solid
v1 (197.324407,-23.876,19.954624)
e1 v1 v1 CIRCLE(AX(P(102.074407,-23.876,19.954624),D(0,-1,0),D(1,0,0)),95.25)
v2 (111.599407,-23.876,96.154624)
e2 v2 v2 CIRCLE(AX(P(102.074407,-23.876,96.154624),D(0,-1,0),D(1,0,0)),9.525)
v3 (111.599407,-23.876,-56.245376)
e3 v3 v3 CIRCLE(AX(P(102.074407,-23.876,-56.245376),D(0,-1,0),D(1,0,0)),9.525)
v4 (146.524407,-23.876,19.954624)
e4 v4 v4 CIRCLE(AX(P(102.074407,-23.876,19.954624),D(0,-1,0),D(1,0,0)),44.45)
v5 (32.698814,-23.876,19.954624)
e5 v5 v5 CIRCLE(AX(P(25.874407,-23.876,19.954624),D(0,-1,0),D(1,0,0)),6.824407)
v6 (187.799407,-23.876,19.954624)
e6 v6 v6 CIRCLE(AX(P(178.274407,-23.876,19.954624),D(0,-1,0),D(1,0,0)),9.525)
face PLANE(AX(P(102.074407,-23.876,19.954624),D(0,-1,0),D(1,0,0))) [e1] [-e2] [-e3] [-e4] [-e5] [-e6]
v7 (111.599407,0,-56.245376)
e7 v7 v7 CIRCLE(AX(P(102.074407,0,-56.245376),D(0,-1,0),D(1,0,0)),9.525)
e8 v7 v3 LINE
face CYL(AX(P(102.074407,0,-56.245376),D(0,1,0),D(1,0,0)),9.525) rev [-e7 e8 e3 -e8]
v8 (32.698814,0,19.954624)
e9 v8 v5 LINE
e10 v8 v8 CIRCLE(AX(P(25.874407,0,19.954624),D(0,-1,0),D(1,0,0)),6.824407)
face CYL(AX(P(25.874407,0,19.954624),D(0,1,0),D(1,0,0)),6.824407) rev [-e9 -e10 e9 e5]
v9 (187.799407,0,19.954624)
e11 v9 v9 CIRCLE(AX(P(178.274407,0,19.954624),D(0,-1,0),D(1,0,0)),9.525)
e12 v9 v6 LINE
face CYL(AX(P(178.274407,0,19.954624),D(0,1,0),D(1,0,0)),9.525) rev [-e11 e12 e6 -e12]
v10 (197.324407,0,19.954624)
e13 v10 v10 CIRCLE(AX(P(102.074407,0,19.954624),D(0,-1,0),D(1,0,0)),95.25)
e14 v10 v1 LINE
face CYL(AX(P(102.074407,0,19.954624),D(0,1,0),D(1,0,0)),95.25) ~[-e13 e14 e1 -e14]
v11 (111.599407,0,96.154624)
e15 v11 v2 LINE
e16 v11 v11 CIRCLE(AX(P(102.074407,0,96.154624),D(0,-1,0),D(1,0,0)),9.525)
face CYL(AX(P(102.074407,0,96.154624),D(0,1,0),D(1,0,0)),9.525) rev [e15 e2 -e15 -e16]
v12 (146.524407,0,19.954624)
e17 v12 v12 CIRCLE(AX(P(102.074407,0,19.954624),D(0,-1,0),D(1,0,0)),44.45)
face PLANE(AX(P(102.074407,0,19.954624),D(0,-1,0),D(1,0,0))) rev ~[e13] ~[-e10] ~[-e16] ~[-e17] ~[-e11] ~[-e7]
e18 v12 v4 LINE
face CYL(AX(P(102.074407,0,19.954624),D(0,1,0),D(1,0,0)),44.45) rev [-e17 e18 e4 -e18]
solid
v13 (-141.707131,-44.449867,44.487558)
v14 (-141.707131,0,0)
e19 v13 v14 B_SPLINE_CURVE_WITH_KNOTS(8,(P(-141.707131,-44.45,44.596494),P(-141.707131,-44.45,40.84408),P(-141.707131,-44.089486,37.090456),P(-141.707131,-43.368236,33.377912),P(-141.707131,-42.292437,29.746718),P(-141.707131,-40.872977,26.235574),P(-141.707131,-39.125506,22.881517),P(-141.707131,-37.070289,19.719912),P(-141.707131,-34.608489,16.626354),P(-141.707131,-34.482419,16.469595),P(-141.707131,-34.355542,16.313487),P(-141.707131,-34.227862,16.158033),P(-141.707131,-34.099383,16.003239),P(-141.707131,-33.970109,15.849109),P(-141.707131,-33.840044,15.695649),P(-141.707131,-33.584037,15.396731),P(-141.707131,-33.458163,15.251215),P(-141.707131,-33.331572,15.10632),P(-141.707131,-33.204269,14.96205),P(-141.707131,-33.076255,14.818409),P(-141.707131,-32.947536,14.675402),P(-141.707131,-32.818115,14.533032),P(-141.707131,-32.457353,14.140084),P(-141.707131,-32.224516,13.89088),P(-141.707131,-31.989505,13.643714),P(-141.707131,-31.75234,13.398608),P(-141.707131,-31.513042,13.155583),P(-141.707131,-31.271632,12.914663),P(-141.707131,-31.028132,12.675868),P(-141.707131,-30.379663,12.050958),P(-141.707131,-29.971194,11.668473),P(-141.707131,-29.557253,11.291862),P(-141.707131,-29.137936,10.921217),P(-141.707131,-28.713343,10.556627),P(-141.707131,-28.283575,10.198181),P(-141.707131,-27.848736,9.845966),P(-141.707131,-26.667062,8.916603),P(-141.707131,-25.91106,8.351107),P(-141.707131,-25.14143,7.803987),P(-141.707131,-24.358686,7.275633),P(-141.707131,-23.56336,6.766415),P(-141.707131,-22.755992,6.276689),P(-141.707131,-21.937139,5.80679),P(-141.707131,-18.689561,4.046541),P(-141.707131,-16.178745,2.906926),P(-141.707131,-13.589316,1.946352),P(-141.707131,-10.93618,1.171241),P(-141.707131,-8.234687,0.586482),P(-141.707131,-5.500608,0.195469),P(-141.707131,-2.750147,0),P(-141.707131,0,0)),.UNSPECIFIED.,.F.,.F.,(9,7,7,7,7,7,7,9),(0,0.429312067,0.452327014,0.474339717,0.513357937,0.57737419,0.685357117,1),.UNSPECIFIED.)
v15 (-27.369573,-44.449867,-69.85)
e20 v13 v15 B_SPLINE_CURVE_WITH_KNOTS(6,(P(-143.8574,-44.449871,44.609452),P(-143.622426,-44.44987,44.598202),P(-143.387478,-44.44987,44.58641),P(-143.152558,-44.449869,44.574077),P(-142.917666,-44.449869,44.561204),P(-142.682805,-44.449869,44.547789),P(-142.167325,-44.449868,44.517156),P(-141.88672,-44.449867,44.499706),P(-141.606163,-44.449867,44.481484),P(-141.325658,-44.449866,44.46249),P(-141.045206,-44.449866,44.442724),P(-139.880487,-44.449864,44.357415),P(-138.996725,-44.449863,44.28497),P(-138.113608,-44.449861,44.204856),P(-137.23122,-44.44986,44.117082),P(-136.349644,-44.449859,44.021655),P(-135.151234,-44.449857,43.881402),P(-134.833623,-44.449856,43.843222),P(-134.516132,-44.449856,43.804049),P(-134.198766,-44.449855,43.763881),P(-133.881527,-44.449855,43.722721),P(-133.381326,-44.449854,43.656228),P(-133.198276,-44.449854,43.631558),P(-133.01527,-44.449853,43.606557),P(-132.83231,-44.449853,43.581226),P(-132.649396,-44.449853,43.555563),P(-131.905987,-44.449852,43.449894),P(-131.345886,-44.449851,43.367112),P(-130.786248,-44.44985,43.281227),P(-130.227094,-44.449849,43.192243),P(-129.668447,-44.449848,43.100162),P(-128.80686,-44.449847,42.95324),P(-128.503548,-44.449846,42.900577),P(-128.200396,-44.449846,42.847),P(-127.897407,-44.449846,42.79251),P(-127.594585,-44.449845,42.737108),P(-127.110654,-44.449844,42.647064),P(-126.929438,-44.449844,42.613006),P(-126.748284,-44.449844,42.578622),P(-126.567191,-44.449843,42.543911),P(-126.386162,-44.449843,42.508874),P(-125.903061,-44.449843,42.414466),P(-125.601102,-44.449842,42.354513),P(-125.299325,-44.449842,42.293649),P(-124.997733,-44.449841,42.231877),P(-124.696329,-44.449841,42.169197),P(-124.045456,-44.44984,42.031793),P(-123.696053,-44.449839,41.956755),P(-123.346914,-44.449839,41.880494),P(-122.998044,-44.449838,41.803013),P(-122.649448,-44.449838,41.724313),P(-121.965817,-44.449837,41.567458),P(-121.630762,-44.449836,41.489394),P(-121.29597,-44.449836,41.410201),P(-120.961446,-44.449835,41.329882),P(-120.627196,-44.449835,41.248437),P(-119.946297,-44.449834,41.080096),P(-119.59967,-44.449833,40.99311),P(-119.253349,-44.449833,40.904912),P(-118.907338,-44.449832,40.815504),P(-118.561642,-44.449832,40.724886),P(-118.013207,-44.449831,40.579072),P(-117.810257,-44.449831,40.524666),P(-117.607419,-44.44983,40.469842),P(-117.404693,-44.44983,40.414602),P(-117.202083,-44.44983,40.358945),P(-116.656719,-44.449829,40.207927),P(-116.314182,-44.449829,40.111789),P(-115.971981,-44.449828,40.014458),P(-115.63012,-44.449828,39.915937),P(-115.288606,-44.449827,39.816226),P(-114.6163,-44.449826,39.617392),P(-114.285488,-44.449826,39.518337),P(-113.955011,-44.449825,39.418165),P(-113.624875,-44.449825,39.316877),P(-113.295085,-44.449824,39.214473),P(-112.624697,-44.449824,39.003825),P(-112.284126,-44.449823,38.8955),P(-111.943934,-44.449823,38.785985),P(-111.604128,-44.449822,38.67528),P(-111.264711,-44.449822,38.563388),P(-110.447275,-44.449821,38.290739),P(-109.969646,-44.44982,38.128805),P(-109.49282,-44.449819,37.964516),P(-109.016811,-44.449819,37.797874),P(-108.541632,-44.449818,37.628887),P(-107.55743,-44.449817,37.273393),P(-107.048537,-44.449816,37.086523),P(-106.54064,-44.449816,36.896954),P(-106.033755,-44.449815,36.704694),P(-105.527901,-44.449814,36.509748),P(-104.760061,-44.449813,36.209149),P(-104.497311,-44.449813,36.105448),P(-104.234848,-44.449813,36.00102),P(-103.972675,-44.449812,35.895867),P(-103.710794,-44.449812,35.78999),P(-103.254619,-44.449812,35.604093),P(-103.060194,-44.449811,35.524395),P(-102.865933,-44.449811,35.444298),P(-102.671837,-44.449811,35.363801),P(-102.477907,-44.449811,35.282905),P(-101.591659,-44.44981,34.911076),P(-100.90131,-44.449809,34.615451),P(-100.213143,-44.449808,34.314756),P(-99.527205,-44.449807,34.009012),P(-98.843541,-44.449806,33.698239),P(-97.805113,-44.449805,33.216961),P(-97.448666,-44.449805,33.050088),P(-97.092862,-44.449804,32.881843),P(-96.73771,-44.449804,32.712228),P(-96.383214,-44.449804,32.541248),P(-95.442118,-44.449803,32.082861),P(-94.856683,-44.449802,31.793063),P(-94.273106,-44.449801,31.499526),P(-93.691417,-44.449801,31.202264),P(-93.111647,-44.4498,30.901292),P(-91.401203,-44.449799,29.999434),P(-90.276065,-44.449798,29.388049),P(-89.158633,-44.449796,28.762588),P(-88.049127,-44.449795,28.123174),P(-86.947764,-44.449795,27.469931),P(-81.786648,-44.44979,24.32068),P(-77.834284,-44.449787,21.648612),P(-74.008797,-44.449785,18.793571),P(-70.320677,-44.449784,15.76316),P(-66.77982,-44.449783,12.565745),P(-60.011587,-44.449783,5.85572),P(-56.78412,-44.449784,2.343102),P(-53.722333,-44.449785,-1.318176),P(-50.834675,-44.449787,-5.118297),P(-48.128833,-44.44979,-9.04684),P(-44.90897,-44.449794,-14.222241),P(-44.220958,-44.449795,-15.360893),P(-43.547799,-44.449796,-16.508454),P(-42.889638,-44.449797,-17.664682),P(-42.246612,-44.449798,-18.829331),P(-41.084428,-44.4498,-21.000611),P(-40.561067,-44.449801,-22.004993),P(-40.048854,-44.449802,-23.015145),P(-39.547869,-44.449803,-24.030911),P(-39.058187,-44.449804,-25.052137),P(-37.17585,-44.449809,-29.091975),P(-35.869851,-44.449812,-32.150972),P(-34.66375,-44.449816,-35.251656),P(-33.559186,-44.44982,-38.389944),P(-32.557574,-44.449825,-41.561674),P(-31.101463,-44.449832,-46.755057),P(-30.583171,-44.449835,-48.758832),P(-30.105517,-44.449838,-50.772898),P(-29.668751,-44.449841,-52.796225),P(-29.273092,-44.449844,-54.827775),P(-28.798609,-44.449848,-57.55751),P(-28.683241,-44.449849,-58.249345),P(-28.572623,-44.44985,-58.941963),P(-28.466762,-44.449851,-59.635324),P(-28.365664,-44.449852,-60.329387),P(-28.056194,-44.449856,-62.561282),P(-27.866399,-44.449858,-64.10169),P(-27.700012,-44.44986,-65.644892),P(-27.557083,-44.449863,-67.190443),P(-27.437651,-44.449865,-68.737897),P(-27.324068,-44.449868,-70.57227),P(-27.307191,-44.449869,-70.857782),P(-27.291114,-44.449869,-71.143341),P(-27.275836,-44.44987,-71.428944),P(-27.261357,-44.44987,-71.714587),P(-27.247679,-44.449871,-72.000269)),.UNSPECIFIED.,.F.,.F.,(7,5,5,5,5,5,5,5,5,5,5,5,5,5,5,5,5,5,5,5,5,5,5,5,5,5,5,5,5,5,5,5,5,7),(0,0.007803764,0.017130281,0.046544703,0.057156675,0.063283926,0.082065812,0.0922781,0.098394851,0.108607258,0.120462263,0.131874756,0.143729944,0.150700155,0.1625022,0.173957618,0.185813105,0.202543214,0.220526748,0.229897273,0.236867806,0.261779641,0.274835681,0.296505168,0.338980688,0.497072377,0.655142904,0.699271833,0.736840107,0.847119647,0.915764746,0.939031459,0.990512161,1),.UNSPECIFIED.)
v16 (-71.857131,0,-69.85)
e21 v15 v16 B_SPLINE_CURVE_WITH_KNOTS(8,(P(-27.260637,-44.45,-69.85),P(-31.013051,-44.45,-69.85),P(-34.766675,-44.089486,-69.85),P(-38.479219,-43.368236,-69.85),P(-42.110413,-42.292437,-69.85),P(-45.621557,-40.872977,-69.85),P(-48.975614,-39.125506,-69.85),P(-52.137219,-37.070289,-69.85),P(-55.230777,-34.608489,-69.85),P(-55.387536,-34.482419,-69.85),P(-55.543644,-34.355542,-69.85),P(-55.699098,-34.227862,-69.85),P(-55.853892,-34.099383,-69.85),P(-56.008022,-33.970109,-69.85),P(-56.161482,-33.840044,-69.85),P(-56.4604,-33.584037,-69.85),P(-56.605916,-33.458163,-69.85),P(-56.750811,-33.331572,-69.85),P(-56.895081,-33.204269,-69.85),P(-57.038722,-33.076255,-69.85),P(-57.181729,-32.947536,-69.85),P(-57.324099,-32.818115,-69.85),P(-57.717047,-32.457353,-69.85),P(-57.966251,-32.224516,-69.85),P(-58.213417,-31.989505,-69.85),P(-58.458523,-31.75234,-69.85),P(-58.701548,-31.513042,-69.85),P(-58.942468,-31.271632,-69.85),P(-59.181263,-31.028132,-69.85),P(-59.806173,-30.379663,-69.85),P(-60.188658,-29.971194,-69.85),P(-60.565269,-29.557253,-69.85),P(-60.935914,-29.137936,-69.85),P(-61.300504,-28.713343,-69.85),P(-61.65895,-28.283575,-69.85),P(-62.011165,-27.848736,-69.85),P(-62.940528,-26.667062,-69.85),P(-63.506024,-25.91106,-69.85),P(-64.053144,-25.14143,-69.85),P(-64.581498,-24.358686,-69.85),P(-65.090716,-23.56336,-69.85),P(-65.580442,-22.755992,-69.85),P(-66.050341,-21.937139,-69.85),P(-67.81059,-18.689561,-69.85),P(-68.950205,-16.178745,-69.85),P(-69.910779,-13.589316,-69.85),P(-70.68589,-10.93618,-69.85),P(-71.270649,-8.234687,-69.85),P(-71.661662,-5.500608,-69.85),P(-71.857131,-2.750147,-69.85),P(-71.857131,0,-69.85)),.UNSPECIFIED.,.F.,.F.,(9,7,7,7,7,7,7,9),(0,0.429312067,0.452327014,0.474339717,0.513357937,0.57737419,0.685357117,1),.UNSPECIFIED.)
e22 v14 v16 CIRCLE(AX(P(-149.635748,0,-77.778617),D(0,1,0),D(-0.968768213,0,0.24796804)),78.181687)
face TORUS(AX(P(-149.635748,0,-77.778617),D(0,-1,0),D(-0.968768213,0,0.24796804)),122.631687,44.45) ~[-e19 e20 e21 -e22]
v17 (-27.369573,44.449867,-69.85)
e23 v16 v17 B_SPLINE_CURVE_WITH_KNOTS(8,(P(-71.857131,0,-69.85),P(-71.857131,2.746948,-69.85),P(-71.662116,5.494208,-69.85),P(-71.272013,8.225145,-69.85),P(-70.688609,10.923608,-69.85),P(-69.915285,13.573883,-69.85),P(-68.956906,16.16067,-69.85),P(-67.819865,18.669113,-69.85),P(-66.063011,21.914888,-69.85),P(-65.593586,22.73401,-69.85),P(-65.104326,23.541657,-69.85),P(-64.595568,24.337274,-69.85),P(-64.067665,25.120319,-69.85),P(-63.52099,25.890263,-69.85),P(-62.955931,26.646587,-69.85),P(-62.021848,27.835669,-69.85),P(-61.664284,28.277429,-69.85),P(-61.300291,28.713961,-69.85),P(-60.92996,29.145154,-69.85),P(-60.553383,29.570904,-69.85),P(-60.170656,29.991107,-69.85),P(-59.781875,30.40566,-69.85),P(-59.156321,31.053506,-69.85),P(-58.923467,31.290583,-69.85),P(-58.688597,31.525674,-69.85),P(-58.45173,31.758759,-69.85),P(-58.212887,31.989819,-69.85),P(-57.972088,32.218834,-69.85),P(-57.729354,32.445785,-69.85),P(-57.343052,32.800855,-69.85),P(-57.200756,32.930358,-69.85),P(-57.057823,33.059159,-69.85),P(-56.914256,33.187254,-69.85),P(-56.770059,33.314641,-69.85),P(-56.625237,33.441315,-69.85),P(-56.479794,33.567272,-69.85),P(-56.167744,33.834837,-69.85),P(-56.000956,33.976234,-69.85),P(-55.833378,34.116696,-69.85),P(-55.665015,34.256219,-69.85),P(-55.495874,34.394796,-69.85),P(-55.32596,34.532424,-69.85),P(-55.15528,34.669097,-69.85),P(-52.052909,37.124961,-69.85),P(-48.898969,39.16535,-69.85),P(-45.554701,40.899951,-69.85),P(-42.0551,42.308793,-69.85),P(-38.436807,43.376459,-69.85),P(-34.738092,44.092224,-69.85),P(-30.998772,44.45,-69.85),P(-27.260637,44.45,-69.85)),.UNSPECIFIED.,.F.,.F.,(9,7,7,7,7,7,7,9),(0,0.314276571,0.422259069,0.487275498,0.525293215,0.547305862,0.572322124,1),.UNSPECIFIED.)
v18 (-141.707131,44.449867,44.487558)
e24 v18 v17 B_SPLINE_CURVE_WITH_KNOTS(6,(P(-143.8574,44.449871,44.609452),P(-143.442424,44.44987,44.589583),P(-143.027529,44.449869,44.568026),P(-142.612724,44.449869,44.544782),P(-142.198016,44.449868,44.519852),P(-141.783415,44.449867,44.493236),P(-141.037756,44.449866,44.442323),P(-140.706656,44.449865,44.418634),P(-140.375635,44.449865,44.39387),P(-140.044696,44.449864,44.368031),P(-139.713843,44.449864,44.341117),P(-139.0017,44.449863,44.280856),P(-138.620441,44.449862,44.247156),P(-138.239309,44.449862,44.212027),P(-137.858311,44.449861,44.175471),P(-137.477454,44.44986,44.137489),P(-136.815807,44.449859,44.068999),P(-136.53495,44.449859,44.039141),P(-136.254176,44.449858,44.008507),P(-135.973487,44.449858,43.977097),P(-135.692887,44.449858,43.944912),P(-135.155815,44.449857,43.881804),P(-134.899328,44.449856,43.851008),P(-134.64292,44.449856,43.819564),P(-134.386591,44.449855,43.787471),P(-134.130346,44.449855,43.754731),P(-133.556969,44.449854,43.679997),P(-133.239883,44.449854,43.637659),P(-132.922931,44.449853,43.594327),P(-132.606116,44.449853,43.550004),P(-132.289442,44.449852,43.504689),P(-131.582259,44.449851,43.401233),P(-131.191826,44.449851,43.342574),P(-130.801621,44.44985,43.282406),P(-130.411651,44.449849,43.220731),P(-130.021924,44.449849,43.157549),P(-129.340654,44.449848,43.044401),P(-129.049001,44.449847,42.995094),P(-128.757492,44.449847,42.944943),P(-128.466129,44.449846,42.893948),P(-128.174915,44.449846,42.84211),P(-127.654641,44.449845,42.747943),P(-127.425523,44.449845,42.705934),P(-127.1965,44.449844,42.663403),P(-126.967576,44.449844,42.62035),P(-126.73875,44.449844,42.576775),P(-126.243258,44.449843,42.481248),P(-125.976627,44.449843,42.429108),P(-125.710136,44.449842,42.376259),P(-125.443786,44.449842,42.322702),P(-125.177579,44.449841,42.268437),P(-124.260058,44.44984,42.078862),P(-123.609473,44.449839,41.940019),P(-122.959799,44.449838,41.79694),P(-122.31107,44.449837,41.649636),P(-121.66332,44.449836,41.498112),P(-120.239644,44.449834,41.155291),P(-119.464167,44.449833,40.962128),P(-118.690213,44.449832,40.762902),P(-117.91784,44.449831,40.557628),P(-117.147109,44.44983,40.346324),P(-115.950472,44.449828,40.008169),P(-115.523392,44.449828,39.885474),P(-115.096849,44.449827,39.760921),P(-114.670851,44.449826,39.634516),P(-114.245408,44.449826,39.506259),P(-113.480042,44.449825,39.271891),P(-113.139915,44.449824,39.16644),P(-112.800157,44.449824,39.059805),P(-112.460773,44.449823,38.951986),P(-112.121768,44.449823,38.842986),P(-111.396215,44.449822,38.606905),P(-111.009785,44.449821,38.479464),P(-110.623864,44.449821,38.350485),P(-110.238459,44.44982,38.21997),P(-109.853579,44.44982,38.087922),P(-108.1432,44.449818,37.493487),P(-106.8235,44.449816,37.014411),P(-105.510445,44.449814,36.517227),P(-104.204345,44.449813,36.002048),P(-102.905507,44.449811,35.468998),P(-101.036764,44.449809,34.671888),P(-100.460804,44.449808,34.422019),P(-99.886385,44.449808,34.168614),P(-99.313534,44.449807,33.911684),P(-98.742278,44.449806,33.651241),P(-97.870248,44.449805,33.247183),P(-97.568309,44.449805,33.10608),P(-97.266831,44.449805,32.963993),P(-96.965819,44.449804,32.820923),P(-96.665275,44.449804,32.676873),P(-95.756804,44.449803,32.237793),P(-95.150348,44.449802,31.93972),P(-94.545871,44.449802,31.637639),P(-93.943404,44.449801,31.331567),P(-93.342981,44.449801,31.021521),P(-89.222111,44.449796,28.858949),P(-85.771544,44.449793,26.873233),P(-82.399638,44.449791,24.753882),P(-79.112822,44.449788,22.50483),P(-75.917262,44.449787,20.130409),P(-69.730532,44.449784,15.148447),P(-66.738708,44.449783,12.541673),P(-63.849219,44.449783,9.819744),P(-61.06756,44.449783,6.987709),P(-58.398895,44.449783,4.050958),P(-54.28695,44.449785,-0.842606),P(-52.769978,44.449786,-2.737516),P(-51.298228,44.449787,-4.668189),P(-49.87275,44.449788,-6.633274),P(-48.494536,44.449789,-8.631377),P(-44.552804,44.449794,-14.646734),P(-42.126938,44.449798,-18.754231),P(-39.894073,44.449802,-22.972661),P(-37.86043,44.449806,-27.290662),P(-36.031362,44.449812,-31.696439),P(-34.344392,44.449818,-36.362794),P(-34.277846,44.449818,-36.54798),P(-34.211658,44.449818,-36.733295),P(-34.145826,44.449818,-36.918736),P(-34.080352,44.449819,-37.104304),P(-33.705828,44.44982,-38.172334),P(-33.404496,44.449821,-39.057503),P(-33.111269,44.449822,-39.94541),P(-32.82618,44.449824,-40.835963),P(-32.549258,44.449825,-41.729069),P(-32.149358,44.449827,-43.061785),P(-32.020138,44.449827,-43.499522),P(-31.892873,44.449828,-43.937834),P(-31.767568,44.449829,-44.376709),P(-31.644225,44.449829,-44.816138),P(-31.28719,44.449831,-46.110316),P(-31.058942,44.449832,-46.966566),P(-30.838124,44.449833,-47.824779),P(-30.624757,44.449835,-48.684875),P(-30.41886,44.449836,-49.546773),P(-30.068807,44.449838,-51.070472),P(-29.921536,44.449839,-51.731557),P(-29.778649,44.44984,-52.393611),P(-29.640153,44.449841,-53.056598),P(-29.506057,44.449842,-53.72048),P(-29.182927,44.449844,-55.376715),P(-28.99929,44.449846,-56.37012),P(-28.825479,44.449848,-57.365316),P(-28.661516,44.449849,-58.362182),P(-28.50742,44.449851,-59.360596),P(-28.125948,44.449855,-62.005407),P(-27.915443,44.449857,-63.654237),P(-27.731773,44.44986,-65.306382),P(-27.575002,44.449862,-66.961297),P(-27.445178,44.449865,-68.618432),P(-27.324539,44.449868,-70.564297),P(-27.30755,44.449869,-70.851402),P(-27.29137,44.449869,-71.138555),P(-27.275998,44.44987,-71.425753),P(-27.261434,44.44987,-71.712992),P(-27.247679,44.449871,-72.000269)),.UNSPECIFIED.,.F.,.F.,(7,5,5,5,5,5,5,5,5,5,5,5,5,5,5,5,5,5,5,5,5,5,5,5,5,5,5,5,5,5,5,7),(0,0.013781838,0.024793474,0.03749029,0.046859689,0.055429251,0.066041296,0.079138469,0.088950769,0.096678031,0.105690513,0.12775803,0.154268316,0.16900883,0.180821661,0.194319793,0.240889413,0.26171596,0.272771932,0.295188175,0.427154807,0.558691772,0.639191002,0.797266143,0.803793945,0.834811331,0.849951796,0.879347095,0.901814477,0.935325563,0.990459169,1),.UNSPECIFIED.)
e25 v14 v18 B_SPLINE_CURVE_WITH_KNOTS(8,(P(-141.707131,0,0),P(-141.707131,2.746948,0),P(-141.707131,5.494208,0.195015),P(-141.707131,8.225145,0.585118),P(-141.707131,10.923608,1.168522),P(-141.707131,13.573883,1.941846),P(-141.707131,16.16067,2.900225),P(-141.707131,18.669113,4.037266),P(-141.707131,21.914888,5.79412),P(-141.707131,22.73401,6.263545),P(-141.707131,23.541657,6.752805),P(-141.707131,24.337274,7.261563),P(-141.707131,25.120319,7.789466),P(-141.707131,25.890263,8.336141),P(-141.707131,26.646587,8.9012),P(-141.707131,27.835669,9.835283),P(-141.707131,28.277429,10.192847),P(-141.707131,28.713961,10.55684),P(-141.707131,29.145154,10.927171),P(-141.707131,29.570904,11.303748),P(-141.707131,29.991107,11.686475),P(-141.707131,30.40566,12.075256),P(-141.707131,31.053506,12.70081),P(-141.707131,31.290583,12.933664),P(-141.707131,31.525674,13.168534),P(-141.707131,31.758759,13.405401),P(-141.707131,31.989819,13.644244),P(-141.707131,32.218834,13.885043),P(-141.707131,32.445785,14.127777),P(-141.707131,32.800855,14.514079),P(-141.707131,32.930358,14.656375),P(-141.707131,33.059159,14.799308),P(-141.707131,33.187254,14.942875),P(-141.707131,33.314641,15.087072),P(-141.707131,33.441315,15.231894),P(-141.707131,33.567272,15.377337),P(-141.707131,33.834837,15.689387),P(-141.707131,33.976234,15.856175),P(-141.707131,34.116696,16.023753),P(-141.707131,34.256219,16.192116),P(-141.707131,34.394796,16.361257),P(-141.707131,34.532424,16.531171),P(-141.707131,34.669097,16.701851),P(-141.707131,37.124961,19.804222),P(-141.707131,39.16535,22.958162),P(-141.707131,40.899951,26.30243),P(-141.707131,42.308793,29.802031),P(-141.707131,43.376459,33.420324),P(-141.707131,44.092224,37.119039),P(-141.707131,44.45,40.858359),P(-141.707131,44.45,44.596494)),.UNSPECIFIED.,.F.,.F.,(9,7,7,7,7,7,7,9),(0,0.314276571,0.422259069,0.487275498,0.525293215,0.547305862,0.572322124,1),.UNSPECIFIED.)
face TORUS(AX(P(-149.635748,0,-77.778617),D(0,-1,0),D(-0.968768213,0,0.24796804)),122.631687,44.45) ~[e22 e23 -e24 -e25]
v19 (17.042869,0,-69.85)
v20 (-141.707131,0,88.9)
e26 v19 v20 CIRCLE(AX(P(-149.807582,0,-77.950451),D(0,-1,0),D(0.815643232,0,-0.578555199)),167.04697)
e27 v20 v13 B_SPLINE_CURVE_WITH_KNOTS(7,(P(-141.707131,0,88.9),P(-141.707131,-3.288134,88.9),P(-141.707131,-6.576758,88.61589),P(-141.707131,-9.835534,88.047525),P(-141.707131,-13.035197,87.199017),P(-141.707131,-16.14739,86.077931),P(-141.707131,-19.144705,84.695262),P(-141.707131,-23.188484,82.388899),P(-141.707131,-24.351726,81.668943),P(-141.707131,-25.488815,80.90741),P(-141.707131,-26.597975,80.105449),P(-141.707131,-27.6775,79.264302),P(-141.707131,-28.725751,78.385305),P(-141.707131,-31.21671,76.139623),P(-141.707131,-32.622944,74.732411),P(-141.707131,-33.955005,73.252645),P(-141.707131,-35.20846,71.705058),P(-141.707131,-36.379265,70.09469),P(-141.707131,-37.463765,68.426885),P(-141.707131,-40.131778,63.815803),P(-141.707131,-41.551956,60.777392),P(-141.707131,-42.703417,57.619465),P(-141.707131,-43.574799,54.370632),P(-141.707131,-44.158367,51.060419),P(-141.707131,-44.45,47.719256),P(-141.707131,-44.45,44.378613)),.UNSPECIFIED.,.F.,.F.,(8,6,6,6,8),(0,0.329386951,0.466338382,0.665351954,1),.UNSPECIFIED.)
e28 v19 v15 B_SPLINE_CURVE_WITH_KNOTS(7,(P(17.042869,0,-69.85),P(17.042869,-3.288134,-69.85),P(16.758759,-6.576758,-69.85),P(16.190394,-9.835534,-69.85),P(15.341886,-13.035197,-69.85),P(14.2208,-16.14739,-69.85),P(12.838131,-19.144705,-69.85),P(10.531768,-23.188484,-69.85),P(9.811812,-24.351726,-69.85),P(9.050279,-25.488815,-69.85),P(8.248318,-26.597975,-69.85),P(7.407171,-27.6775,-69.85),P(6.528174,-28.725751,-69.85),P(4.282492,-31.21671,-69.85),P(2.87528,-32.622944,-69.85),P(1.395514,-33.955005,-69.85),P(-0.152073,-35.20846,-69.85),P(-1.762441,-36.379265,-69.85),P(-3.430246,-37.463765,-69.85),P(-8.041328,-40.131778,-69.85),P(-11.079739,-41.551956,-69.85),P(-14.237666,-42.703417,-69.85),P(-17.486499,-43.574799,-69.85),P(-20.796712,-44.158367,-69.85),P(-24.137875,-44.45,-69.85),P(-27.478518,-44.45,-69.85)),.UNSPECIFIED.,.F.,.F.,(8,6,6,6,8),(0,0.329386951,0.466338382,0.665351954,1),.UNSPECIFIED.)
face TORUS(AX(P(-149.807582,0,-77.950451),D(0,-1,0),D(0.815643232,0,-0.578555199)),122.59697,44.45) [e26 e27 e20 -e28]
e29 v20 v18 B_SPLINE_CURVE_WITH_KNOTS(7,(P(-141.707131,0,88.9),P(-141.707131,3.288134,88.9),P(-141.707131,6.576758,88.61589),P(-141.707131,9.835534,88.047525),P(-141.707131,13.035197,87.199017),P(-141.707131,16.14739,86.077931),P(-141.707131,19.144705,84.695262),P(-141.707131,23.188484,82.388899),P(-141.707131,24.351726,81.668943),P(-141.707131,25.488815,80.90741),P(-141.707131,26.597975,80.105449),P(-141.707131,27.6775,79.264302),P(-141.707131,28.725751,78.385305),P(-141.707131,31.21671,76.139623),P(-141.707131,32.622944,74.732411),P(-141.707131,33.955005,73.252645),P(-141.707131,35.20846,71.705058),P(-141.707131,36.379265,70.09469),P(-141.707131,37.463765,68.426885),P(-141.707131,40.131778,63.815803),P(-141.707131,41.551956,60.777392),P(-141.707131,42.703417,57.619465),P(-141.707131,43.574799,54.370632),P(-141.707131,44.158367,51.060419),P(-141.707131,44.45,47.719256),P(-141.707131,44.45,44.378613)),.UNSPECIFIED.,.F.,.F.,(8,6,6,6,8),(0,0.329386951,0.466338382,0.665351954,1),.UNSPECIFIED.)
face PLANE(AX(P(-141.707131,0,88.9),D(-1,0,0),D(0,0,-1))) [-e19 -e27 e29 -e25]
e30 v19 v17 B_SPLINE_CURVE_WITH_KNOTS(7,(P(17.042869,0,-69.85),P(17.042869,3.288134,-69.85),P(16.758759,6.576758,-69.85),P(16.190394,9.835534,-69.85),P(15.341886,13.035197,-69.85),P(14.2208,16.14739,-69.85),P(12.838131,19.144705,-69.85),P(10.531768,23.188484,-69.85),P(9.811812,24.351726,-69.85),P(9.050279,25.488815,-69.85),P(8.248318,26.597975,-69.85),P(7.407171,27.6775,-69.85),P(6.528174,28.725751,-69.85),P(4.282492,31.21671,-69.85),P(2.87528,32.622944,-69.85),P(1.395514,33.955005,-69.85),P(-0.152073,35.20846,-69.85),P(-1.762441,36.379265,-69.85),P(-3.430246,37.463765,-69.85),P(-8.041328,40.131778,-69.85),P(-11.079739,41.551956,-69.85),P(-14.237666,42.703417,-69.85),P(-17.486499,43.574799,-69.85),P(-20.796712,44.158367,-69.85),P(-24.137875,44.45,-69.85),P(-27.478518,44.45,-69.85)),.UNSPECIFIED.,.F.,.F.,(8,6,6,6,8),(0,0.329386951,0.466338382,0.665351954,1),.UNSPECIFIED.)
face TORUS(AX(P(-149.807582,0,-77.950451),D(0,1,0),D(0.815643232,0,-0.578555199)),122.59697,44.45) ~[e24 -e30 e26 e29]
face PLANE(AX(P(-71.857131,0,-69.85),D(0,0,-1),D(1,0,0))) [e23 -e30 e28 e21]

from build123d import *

# Parameters (mm, degrees)
F1_DEPTH    = 44.45
F2_T2_ANGLE = 160.6979741432
F2_T4_ANGLE = 241.2853924859
F2_T6_ANGLE = 160.6979741432
F2_T8_ANGLE = 241.2853924859
F3_R        = 95.25
F3_R_2      = 9.525
F3_R_3      = 6.8244070411
F3_R_4      = 44.45
F4_DEPTH    = 23.876


# Not quite as in the source:
# - a fillet or chamfer that OpenCascade refuses, or shapes differently, is made with other operations: its cross-section is extruded or revolved along the edge and cut away or added


with BuildPart() as f1:
    # F0 (on Front) → F1 (new body, symmetric)
    with BuildSketch(Plane.XZ):
        with BuildLine():
            Line((-141.7071309926, 88.9), (-141.7071309926, 0))
            ThreePointArc((-141.7071309926, 0), (-94.3529466908, -22.4958156982), (-71.8571309926, -69.85))
            Line((-71.8571309926, -69.85), (-27.4071309926, -69.85))
            Line((-27.4071309926, -69.85), (17.0428690074, -69.85))
            ThreePointArc((17.0428690074, -69.85), (-31.6875363662, 40.1695946264), (-141.7071309926, 88.9))
        make_face()
    extrude(amount=F1_DEPTH, both=True)

    # F2: fillet of radius 44.45 on 4 edges, made by hand

    # F2_s1 → F2_t2 (revolve, cut)
    with BuildSketch(Plane(origin=(-86.9289094925, 0, -122.5517924567), x_dir=(0, 1, 0), z_dir=(-0.5785551991, 0, -0.8156432318))):
        with BuildLine():
            ThreePointArc((0, 89.9560683749), (-31.4308964237, 76.9369647986), (-44.45, 45.5060683749))
            Line((-44.45, 45.5060683749), (-44.45, 89.9560683749))
            Line((-44.45, 89.9560683749), (0, 89.9560683749))
        make_face()
    revolve(axis=Axis((-149.8075815664, -44.45, -77.9504505738), (0, -1, 0)), revolution_arc=F2_T2_ANGLE, mode=Mode.SUBTRACT)

    # F2_s3 → F2_t4 (revolve, cut)
    with BuildSketch(Plane(origin=(-27.8850809272, 0, -108.9421849099), x_dir=(0, 1, 0), z_dir=(-0.2479680397, 0, -0.9687682134))):
        with BuildLine():
            ThreePointArc((-44.45, -248.3074320129), (-31.4308964237, -216.8765355892), (0, -203.8574320129))
            Line((0, -203.8574320129), (-44.45, -203.8574320129))
            Line((-44.45, -203.8574320129), (-44.45, -248.3074320129))
        make_face()
    revolve(axis=Axis((-149.6357477999, -44.45, -77.7786168073), (0, 1, 0)), revolution_arc=F2_T4_ANGLE, mode=Mode.SUBTRACT)

    # F2_s5 → F2_t6 (revolve, cut)
    with BuildSketch(Plane(origin=(-86.9289094925, 0, -122.5517924567), x_dir=(0, 1, 0), z_dir=(-0.5785551991, 0, -0.8156432318))):
        with BuildLine():
            ThreePointArc((0, 89.9560683749), (31.4308964237, 76.9369647986), (44.45, 45.5060683749))
            Line((44.45, 45.5060683749), (44.45, 89.9560683749))
            Line((44.45, 89.9560683749), (0, 89.9560683749))
        make_face()
    revolve(axis=Axis((-149.8075815664, 44.45, -77.9504505738), (0, -1, 0)), revolution_arc=F2_T6_ANGLE, mode=Mode.SUBTRACT)

    # F2_s7 → F2_t8 (revolve, cut)
    with BuildSketch(Plane(origin=(-27.8850809272, 0, -108.9421849099), x_dir=(0, 1, 0), z_dir=(-0.2479680397, 0, -0.9687682134))):
        with BuildLine():
            ThreePointArc((0, -203.8574320129), (31.4308964237, -216.8765355892), (44.45, -248.3074320129))
            Line((44.45, -248.3074320129), (44.45, -203.8574320129))
            Line((44.45, -203.8574320129), (0, -203.8574320129))
        make_face()
    revolve(axis=Axis((-149.6357477999, 44.45, -77.7786168073), (0, 1, 0)), revolution_arc=F2_T8_ANGLE, mode=Mode.SUBTRACT)


with BuildPart() as f4:
    # F3 (on Front) → F4 (new body)
    with BuildSketch(Plane.XZ):
        with Locations((102.0744070411, 19.9546236545)):
            Circle(F3_R)
        with Locations((102.0744070411, -56.2453763455)):
            Circle(F3_R_2, mode=Mode.SUBTRACT)
        with Locations((25.8744070411, 19.9546236545)):
            Circle(F3_R_3, mode=Mode.SUBTRACT)
        with Locations((102.0744070411, 19.9546236545)):
            Circle(F3_R_4, mode=Mode.SUBTRACT)
        with Locations((178.2744070411, 19.9546236545)):
            Circle(F3_R_2, mode=Mode.SUBTRACT)
        with Locations((102.0744070411, 96.1546236545)):
            Circle(F3_R_2, mode=Mode.SUBTRACT)
    extrude(amount=F4_DEPTH)


solid = Compound([f1.part, f4.part])
